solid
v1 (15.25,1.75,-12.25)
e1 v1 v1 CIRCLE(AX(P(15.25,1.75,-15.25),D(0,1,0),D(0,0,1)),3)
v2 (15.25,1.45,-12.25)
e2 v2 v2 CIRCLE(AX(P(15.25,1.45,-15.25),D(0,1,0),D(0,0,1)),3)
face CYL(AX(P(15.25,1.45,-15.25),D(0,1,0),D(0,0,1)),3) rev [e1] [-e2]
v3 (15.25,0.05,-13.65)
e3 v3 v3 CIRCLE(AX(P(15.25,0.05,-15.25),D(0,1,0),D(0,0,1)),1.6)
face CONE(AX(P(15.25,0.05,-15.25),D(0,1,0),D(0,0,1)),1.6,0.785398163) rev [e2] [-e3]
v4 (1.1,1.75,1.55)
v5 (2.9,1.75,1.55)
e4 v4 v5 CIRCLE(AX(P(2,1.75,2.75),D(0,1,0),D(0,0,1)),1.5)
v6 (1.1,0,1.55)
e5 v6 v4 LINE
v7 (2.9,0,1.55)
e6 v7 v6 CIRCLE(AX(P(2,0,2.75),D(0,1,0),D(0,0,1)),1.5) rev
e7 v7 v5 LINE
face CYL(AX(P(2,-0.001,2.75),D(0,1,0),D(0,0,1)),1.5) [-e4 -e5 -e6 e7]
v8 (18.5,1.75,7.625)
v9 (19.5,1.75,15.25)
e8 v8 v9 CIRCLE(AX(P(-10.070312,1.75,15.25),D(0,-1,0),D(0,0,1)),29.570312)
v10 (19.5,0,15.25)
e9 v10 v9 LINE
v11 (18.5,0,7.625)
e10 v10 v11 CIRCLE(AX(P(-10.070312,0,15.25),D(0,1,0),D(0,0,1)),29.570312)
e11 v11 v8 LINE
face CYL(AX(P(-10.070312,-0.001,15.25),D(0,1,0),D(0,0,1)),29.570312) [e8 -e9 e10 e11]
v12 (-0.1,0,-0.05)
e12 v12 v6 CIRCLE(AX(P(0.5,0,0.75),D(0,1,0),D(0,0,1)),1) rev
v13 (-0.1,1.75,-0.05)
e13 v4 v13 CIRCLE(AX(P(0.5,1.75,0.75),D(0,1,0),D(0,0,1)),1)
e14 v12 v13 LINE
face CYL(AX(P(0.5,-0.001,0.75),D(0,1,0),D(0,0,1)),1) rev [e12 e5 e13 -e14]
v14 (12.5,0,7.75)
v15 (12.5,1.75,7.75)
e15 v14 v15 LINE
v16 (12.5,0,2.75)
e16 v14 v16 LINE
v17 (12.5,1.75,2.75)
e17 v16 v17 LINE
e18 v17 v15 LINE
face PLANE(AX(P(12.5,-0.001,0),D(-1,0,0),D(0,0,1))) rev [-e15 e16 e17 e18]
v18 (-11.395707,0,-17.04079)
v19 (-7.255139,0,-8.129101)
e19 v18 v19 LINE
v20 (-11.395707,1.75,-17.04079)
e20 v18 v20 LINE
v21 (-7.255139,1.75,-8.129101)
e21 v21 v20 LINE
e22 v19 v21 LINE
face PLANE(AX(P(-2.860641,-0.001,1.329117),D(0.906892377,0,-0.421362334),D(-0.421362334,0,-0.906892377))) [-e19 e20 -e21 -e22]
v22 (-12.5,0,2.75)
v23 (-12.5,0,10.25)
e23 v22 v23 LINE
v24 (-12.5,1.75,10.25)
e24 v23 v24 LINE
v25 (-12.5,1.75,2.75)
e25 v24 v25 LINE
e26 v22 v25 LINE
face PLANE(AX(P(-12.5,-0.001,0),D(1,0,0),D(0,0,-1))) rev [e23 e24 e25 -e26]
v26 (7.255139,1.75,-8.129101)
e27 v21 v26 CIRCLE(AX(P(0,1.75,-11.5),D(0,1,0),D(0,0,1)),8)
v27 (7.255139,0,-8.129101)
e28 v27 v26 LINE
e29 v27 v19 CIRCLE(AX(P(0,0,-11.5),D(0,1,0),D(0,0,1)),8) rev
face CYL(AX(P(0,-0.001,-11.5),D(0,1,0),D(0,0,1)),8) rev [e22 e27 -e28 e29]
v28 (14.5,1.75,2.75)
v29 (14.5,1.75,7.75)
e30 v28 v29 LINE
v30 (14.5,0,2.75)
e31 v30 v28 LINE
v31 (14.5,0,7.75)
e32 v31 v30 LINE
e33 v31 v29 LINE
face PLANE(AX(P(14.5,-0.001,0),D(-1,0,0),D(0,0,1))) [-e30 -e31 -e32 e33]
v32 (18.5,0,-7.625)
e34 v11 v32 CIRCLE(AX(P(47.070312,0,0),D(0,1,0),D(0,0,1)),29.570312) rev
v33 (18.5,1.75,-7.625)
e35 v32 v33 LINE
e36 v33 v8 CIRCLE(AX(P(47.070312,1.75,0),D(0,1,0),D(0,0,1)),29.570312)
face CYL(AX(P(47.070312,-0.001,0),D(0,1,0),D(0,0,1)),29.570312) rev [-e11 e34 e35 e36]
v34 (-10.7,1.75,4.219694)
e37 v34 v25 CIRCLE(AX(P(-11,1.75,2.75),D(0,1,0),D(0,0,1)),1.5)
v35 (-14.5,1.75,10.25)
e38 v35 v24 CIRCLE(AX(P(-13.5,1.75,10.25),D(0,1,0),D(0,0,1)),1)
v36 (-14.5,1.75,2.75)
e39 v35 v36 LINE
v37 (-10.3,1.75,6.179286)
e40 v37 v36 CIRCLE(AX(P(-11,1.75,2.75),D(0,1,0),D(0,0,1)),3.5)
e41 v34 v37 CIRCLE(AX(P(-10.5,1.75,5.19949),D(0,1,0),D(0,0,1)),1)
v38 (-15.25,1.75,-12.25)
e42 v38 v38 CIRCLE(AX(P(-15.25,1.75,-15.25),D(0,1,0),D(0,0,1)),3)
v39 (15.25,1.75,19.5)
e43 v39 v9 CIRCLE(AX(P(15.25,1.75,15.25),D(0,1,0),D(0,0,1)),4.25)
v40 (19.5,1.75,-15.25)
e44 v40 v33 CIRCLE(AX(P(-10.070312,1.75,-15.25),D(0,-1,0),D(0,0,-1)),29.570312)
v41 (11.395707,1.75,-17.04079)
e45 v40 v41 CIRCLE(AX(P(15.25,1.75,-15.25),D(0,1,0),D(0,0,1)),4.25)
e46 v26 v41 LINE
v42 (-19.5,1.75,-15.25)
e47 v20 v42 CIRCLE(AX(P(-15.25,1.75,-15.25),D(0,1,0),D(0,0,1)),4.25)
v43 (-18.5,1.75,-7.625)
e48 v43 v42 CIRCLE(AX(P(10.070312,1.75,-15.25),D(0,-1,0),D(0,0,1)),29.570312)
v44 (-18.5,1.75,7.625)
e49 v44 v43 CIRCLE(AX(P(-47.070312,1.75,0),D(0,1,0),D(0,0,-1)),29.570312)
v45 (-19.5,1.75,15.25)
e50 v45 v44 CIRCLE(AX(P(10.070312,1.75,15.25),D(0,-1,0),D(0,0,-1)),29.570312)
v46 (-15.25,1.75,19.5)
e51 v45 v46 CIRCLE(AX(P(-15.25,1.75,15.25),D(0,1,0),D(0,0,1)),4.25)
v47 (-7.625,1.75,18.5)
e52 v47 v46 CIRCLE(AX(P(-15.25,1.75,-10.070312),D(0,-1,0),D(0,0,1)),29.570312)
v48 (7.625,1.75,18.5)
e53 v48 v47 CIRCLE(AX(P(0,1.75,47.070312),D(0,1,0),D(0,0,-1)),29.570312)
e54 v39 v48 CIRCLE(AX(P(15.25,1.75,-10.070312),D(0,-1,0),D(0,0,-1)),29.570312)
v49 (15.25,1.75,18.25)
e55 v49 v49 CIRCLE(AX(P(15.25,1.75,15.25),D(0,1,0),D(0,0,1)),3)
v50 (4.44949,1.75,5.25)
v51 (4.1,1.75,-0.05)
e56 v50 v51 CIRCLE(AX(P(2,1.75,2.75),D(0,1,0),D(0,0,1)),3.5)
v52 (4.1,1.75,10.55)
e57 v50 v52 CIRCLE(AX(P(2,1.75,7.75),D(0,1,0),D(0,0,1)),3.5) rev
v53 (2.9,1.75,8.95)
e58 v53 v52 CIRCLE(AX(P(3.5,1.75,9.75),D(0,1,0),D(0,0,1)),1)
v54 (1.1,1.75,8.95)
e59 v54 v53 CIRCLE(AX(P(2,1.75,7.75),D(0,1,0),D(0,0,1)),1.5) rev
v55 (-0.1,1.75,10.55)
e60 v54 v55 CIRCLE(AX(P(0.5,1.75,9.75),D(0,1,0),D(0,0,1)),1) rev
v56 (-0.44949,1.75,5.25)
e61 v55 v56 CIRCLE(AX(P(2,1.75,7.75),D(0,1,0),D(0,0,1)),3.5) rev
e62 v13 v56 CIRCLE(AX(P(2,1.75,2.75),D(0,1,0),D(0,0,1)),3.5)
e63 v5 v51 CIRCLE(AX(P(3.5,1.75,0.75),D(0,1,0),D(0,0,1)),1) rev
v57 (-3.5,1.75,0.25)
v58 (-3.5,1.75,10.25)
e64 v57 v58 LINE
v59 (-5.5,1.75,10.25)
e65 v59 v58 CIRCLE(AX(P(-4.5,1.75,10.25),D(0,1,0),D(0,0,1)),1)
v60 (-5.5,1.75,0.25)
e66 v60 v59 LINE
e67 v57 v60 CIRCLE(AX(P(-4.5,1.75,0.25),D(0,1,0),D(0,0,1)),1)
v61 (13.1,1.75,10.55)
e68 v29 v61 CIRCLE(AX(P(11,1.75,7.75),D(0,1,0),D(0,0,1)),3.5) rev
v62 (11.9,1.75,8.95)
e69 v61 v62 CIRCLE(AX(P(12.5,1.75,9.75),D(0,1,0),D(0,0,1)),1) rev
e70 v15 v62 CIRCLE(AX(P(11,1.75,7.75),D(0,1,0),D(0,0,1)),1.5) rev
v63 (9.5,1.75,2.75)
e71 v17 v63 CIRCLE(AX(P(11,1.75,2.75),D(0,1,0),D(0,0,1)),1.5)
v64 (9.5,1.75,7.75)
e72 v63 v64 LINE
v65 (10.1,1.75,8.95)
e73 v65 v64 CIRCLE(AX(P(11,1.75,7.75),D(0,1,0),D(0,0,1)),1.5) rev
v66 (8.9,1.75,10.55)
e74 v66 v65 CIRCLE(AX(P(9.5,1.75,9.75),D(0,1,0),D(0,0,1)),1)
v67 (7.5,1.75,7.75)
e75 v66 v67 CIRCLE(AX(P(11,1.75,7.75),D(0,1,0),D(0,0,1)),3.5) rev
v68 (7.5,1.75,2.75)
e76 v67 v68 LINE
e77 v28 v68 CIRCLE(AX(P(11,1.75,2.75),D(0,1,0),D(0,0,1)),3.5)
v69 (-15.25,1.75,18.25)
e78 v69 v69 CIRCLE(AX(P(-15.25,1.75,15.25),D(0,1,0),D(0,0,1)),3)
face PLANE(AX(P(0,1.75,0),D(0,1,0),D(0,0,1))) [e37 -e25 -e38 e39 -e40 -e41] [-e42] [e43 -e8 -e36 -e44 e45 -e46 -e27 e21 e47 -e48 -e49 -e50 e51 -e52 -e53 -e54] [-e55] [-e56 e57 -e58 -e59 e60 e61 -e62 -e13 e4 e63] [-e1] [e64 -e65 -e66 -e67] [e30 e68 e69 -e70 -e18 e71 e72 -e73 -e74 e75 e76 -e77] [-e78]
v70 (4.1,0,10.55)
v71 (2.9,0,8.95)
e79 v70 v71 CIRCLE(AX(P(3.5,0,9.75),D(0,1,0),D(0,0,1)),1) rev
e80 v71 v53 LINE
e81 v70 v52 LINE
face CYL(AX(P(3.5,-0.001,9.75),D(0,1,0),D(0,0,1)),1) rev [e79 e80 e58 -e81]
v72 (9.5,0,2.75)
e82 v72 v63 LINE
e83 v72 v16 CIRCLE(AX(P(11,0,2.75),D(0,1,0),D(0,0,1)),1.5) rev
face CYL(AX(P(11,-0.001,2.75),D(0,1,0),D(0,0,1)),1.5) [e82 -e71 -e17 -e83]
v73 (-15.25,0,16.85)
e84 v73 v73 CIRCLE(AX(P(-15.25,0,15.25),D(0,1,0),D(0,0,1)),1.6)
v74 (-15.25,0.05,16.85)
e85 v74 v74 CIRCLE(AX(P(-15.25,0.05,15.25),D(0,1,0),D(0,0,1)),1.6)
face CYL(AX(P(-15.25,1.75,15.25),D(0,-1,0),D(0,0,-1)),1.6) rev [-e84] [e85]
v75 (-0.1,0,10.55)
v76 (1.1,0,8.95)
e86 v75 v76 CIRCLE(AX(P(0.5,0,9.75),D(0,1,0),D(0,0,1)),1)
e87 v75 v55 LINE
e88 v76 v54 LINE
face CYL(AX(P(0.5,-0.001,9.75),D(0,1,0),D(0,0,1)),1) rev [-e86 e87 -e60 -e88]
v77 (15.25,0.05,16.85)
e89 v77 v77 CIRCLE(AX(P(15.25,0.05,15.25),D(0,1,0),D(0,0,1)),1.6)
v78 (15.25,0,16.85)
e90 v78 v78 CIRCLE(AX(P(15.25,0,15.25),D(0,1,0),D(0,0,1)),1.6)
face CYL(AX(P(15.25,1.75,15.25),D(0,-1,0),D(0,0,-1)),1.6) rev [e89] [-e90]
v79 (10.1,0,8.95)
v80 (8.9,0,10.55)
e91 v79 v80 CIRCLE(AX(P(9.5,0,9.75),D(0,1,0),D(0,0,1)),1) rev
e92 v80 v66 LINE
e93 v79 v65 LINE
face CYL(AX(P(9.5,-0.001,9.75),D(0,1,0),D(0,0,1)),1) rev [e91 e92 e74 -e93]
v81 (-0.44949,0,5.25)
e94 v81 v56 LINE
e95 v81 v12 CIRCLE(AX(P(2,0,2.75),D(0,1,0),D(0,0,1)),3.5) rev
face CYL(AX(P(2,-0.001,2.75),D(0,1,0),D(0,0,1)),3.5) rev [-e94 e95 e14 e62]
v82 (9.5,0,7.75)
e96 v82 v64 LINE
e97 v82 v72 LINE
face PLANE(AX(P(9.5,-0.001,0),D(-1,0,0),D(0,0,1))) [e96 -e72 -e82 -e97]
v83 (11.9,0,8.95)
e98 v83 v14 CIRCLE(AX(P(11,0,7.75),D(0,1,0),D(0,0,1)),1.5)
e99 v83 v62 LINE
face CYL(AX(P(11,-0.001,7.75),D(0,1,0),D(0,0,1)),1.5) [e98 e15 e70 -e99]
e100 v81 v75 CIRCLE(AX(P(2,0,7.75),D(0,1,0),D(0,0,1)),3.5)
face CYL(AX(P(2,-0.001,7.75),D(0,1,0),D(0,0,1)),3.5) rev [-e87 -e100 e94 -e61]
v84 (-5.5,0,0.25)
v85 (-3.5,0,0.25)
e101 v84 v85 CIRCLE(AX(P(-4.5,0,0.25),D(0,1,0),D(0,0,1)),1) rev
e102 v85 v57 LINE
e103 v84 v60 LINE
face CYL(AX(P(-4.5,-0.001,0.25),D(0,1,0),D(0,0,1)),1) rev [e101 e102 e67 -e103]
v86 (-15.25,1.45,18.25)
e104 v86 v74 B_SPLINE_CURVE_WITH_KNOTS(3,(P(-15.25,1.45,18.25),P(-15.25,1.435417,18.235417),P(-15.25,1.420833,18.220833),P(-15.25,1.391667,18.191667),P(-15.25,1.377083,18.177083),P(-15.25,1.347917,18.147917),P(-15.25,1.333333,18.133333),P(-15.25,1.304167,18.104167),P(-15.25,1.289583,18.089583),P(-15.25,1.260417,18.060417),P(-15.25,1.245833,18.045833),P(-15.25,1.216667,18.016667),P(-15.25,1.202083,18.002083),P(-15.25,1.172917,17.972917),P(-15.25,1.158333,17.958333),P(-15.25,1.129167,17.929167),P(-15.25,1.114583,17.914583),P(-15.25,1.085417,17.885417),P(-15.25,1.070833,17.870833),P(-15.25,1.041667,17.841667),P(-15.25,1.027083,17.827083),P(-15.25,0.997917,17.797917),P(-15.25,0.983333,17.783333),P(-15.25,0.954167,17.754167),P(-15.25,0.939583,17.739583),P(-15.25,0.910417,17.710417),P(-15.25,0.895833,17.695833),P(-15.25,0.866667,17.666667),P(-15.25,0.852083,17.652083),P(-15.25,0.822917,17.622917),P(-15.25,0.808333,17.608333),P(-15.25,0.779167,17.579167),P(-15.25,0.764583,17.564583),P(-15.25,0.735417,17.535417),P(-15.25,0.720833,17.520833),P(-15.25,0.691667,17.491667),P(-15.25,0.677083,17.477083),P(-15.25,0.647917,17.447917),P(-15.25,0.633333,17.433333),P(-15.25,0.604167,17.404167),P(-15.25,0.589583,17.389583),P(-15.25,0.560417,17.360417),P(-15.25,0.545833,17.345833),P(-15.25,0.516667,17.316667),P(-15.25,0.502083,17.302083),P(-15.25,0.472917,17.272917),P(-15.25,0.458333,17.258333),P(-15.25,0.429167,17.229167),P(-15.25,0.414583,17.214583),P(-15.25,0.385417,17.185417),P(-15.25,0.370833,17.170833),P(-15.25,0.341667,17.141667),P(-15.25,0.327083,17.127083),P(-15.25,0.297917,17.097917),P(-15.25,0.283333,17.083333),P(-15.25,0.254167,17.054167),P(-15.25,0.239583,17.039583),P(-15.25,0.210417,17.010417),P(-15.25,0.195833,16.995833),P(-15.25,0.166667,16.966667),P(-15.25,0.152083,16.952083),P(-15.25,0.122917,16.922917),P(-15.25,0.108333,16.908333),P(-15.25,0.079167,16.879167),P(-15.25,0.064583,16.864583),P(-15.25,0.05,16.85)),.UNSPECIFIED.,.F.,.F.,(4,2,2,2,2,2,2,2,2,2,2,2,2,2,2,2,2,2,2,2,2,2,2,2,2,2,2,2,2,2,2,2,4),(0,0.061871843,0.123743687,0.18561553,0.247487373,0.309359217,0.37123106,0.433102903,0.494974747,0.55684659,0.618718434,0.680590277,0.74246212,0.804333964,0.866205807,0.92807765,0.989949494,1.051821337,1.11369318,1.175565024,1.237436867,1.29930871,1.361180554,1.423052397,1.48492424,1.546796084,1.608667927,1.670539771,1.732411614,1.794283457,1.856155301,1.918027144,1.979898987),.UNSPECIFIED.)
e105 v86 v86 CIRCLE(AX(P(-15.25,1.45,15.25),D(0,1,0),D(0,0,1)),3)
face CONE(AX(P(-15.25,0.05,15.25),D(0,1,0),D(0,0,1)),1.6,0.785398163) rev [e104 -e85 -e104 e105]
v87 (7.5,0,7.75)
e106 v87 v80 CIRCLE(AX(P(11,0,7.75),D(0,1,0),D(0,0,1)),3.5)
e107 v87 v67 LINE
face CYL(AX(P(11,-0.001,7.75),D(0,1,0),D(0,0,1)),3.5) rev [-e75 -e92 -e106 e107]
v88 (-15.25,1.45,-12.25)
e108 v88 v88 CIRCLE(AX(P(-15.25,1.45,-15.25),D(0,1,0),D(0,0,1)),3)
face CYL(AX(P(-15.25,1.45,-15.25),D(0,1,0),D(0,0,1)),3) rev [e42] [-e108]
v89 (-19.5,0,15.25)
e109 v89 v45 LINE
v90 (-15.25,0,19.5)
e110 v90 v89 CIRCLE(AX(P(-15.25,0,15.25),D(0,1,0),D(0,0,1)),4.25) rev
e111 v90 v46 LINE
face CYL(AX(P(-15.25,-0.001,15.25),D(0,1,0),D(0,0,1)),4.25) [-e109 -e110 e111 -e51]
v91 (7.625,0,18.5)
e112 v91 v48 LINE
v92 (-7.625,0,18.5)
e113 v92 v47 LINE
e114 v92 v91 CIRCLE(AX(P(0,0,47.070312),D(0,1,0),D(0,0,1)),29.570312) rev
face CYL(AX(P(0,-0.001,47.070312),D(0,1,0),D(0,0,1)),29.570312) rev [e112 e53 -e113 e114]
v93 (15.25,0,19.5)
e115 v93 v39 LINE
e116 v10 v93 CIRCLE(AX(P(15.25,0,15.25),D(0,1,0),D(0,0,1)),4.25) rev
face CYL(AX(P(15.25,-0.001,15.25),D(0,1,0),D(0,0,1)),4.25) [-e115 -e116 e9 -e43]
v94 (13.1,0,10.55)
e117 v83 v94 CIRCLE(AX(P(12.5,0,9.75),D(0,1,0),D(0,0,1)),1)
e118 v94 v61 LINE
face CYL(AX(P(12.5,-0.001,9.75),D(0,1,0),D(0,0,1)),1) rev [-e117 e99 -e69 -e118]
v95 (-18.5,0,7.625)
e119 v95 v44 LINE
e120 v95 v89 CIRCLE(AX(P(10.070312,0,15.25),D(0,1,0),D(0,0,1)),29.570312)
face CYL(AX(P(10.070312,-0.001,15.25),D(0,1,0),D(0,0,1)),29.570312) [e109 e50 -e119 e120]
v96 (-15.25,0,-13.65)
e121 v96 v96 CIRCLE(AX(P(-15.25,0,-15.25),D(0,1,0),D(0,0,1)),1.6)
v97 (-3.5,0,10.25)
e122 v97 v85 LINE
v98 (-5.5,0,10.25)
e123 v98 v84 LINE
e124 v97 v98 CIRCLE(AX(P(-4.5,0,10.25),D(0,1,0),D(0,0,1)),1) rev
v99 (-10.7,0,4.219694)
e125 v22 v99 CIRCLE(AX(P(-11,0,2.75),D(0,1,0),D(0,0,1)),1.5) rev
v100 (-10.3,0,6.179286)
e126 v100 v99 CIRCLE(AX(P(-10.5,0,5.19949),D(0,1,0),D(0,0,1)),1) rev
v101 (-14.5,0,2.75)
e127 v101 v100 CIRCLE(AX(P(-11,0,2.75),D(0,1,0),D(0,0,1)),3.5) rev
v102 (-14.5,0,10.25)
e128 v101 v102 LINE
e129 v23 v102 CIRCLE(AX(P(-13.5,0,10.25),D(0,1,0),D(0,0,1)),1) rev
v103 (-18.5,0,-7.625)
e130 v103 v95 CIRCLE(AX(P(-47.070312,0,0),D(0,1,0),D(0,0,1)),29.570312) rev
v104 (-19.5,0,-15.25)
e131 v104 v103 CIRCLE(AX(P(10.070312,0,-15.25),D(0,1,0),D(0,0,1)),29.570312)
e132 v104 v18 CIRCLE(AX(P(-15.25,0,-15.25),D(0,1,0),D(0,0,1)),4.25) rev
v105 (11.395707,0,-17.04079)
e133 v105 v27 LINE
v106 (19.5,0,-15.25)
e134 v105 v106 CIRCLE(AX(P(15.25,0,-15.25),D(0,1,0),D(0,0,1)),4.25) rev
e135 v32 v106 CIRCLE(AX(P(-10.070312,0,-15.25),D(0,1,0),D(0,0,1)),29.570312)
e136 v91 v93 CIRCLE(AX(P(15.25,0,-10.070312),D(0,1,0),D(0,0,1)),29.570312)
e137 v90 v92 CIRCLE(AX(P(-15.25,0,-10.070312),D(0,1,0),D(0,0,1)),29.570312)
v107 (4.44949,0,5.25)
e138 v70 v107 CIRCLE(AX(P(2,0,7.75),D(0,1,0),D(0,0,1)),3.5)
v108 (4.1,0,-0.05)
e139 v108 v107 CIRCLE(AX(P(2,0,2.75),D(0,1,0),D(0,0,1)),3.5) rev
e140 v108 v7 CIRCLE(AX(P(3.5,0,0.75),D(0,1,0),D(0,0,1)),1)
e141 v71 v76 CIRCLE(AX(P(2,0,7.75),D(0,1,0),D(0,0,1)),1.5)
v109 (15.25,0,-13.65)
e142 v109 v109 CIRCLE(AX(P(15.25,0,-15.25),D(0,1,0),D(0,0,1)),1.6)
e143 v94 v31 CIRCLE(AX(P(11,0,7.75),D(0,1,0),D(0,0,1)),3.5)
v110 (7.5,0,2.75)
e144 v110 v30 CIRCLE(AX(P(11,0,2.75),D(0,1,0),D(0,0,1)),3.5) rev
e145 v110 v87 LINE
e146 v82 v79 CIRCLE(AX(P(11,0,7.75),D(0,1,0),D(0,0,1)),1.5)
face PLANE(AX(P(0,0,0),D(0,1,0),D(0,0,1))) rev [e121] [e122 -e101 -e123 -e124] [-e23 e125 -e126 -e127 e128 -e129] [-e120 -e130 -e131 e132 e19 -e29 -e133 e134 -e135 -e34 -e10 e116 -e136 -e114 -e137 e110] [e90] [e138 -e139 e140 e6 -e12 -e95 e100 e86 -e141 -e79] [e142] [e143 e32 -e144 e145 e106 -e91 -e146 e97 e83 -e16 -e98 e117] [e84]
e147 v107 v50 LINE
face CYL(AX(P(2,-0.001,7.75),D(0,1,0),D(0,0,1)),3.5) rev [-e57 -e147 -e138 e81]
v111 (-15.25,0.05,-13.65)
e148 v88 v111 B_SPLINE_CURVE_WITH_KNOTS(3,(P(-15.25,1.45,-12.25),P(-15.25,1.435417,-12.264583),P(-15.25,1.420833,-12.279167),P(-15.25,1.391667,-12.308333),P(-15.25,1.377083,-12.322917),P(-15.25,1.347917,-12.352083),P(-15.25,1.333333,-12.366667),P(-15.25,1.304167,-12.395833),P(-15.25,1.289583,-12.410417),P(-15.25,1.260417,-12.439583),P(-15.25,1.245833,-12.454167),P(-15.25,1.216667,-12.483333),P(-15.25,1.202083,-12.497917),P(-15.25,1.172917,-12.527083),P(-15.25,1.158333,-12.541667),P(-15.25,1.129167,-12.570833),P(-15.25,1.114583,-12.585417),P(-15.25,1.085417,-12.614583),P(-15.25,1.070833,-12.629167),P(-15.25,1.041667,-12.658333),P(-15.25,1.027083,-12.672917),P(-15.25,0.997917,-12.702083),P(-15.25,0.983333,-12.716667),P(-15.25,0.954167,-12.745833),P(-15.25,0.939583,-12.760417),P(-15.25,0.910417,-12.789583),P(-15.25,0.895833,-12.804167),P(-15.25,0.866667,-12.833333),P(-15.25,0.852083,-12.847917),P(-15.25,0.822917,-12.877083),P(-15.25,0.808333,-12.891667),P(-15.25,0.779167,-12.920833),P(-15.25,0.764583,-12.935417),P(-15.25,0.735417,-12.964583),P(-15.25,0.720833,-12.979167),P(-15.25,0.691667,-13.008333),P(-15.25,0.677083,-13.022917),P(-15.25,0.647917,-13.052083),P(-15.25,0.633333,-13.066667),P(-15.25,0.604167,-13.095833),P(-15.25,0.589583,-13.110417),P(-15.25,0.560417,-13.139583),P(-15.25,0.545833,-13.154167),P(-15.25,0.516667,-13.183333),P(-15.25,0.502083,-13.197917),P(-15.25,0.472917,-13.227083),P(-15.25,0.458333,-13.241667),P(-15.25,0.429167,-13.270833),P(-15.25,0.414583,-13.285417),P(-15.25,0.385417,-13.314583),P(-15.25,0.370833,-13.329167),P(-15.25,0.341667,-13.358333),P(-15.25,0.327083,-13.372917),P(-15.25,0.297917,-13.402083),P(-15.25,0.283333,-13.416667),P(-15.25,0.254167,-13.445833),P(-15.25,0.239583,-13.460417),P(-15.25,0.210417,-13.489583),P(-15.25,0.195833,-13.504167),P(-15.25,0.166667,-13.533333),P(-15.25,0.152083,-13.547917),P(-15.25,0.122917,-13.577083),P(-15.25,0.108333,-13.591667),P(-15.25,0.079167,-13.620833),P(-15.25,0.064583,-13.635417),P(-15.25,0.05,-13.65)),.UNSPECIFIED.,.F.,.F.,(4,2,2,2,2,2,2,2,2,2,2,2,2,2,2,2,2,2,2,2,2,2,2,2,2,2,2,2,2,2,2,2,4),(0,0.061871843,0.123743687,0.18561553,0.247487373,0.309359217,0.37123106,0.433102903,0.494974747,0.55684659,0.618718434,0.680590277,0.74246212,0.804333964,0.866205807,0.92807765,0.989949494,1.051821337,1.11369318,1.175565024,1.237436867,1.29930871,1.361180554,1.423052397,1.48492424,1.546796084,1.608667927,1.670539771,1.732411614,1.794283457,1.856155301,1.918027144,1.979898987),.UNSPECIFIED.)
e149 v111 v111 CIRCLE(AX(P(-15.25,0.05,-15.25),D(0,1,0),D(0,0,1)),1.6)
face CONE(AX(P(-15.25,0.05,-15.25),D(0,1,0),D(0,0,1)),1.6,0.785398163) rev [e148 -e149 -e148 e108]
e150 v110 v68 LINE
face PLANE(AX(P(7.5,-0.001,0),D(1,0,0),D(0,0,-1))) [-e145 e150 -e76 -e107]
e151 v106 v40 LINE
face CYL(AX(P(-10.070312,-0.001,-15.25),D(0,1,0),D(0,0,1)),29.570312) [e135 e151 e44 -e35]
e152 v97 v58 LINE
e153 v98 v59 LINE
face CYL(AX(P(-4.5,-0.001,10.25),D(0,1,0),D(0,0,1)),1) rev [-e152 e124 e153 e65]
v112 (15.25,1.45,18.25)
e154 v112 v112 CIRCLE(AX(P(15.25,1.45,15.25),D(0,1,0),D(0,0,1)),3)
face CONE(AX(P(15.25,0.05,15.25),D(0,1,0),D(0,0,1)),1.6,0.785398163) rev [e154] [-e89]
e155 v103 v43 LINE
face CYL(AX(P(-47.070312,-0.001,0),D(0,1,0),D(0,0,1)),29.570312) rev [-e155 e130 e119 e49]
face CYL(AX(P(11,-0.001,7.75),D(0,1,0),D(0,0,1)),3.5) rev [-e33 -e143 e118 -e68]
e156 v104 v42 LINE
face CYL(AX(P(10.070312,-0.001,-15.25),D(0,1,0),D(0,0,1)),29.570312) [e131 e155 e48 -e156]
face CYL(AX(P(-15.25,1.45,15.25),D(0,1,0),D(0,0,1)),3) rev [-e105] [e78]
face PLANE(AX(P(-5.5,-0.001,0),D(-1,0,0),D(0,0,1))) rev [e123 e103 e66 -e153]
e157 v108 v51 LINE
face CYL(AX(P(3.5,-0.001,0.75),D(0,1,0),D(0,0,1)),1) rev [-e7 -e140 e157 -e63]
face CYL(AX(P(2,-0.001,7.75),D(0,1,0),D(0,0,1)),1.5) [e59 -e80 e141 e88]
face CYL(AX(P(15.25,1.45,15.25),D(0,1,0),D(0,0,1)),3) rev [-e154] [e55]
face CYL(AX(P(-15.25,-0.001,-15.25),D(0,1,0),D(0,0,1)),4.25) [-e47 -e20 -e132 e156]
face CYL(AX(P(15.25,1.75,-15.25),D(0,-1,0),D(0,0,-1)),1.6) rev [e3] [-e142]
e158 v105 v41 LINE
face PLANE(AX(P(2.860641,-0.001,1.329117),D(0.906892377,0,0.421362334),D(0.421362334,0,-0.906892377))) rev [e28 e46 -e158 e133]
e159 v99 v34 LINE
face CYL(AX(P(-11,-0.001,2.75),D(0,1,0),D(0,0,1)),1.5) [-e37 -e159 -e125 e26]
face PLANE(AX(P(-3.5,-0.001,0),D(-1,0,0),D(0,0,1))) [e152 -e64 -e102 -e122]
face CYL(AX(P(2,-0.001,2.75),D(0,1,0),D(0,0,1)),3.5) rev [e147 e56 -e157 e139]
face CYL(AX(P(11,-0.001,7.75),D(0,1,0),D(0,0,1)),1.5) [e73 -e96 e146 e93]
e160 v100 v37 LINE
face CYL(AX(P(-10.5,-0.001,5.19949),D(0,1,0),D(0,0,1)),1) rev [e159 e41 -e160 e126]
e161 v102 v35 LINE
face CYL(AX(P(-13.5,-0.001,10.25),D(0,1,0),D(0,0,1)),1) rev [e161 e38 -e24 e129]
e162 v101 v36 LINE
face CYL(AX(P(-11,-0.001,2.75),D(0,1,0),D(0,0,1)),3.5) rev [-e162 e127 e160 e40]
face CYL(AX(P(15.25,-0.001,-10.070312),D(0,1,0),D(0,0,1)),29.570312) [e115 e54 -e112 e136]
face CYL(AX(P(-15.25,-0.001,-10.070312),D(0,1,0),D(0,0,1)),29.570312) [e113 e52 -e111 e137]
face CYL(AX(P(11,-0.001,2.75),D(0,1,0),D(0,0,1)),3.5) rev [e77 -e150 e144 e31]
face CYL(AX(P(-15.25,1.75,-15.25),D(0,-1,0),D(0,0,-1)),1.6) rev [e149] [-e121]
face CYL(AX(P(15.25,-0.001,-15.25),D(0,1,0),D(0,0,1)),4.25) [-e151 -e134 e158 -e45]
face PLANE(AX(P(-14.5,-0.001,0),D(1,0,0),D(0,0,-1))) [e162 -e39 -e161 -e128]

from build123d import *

# Parameters (mm, degrees)
SKETCH1_W                = 39
SKETCH1_H                = 39
SKETCH1_R                = 1.6
SHAPE_DEPTH              = 1.75
CAMERA_CUT_REACH         = 29.633
SKETCH2_R                = 8
SKETCH4_R                = 3
SCREW_HEAD_CUTS_DEPTH    = 0.3
SCREW_HEAD_CHAMFERS_SIZE = 1.4
BEAUTY_CUTS_REACH        = 29.633
NAME_REACH               = 29.633


with BuildPart() as part:
    # Sketch1 → Shape (new body)
    with BuildSketch(Plane(origin=(0, 0, 0), x_dir=(1, 0, 0), z_dir=(0, 1, 0))):
        Rectangle(SKETCH1_W, SKETCH1_H)
        with Locations(Location((-15.25, 15.25, 0), (0, 0, 270))):
            Circle(SKETCH1_R, mode=Mode.SUBTRACT)
        with Locations(Location((15.25, 15.25, 0), (0, 0, 270))):
            Circle(SKETCH1_R, mode=Mode.SUBTRACT)
        with Locations(Location((-15.25, -15.25, 0), (0, 0, 270))):
            Circle(SKETCH1_R, mode=Mode.SUBTRACT)
        with Locations(Location((15.25, -15.25, 0), (0, 0, 270))):
            Circle(SKETCH1_R, mode=Mode.SUBTRACT)
    extrude(amount=SHAPE_DEPTH)

    # Sketch2 → Camera cut (cut, up to next)
    with BuildSketch(Plane(origin=(0, 1.75, 0), x_dir=(1, 0, 0), z_dir=(0, 1, 0)), mode=Mode.PRIVATE) as camera_cut_sk1:
        with BuildLine():
            Line((-11.395707469, 17.040790074), (-7.255139017, 8.12910133))
            ThreePointArc((-7.255139017, 8.12910133), (-6.744152629, 15.803069291), (0, 19.5))
            Line((0, 19.5), (-12.538311002, 19.5))
            Line((-12.538311002, 19.5), (-11.395707469, 17.040790074))
        make_face()
    camera_cut_tool1 = extrude(camera_cut_sk1.sketch, amount=-CAMERA_CUT_REACH, mode=Mode.PRIVATE) & part.part
    # Sketch2 → Camera cut (cut, up to next)
    with BuildSketch(Plane(origin=(0, 1.75, 0), x_dir=(1, 0, 0), z_dir=(0, 1, 0)), mode=Mode.PRIVATE) as camera_cut_sk2:
        with Locations((0, 11.5)):
            Circle(SKETCH2_R)
    camera_cut_tool2 = extrude(camera_cut_sk2.sketch, amount=-CAMERA_CUT_REACH, mode=Mode.PRIVATE) & part.part
    # Sketch2 → Camera cut (cut, up to next)
    with BuildSketch(Plane(origin=(0, 1.75, 0), x_dir=(1, 0, 0), z_dir=(0, 1, 0)), mode=Mode.PRIVATE) as camera_cut_sk3:
        with BuildLine():
            ThreePointArc((8, 11.5), (7.811565533, 9.773893418), (7.255139017, 8.12910133))
            Line((7.255139017, 8.12910133), (11.395707531, 17.040790207))
            Line((11.395707531, 17.040790207), (12.538311002, 19.5))
            Line((12.538311002, 19.5), (0, 19.5))
            ThreePointArc((0, 19.5), (5.656854249, 17.156854249), (8, 11.5))
        make_face()
    camera_cut_tool3 = extrude(camera_cut_sk3.sketch, amount=-CAMERA_CUT_REACH, mode=Mode.PRIVATE) & part.part
    # Sketch2 → Camera cut (cut, up to next)
    with BuildSketch(Plane(origin=(0, 1.75, 0), x_dir=(1, 0, 0), z_dir=(0, 1, 0)), mode=Mode.PRIVATE) as camera_cut_sk4:
        with BuildLine():
            ThreePointArc((-15.249999971, 19.5), (-12.963994499, 18.832831122), (-11.395707469, 17.040790074))
            Line((-11.395707469, 17.040790074), (-12.538311002, 19.5))
            Line((-12.538311002, 19.5), (-15.249999971, 19.5))
        make_face()
    camera_cut_tool4 = extrude(camera_cut_sk4.sketch, amount=-CAMERA_CUT_REACH, mode=Mode.PRIVATE) & part.part
    # Sketch2 → Camera cut (cut, up to next)
    with BuildSketch(Plane(origin=(0, 1.75, 0), x_dir=(1, 0, 0), z_dir=(0, 1, 0)), mode=Mode.PRIVATE) as camera_cut_sk5:
        with BuildLine():
            Line((12.538311002, 19.5), (11.395707531, 17.040790207))
            ThreePointArc((11.395707531, 17.040790207), (12.963994574, 18.83283117), (15.25, 19.5))
            Line((15.25, 19.5), (12.538311002, 19.5))
        make_face()
    camera_cut_tool5 = extrude(camera_cut_sk5.sketch, amount=-CAMERA_CUT_REACH, mode=Mode.PRIVATE) & part.part
    # Sketch2 → Camera cut (cut, up to next)
    with BuildSketch(Plane(origin=(0, 1.75, 0), x_dir=(1, 0, 0), z_dir=(0, 1, 0)), mode=Mode.PRIVATE) as camera_cut_sk6:
        with BuildLine():
            ThreePointArc((-19.5, 15.25), (-18.25520381, 18.25520383), (-15.249999971, 19.5))
            Line((-15.249999971, 19.5), (-19.5, 19.5))
            Line((-19.5, 19.5), (-19.5, 15.25))
        make_face()
    camera_cut_tool6 = extrude(camera_cut_sk6.sketch, amount=-CAMERA_CUT_REACH, mode=Mode.PRIVATE) & part.part
    # Sketch2 → Camera cut (cut, up to next)
    with BuildSketch(Plane(origin=(0, 1.75, 0), x_dir=(1, 0, 0), z_dir=(0, 1, 0)), mode=Mode.PRIVATE) as camera_cut_sk7:
        with BuildLine():
            Line((19.5, 19.5), (15.25, 19.5))
            ThreePointArc((15.25, 19.5), (18.25520382, 18.25520382), (19.5, 15.25))
            Line((19.5, 15.25), (19.5, 19.5))
        make_face()
    camera_cut_tool7 = extrude(camera_cut_sk7.sketch, amount=-CAMERA_CUT_REACH, mode=Mode.PRIVATE) & part.part
    # Sketch2 → Camera cut (cut, up to next)
    with BuildSketch(Plane(origin=(0, 1.75, 0), x_dir=(1, 0, 0), z_dir=(0, 1, 0)), mode=Mode.PRIVATE) as camera_cut_sk8:
        with BuildLine():
            Line((19.5, -19.5), (19.5, -15.25))
            ThreePointArc((19.5, -15.25), (18.255203817, -18.255203823), (15.249999992, -19.5))
            Line((15.249999992, -19.5), (19.5, -19.5))
        make_face()
    camera_cut_tool8 = extrude(camera_cut_sk8.sketch, amount=-CAMERA_CUT_REACH, mode=Mode.PRIVATE) & part.part
    # Sketch2 → Camera cut (cut, up to next)
    with BuildSketch(Plane(origin=(0, 1.75, 0), x_dir=(1, 0, 0), z_dir=(0, 1, 0)), mode=Mode.PRIVATE) as camera_cut_sk9:
        with BuildLine():
            ThreePointArc((-15.25, -19.5), (-18.255203845, -18.255203795), (-19.5, -15.249999928))
            Line((-19.5, -15.249999928), (-19.5, -19.5))
            Line((-19.5, -19.5), (-15.25, -19.5))
        make_face()
    camera_cut_tool9 = extrude(camera_cut_sk9.sketch, amount=-CAMERA_CUT_REACH, mode=Mode.PRIVATE) & part.part
    add(camera_cut_tool1.solids().sort_by_distance((-8.247862, 1.75, -16.762503))[0], mode=Mode.SUBTRACT)
    add(camera_cut_tool2.solids().sort_by_distance((0, 1.75, -11.5))[0], mode=Mode.SUBTRACT)
    add(camera_cut_tool3.solids().sort_by_distance((8.247862, 1.75, -16.762503))[0], mode=Mode.SUBTRACT)
    add(camera_cut_tool4.solids().sort_by_distance((-12.870391, 1.75, -18.979534))[0], mode=Mode.SUBTRACT)
    add(camera_cut_tool5.solids().sort_by_distance((12.870391, 1.75, -18.979534))[0], mode=Mode.SUBTRACT)
    add(camera_cut_tool6.solids().sort_by_distance((-18.550686, 1.75, -18.550686))[0], mode=Mode.SUBTRACT)
    add(camera_cut_tool7.solids().sort_by_distance((18.550686, 1.75, -18.550686))[0], mode=Mode.SUBTRACT)
    add(camera_cut_tool8.solids().sort_by_distance((18.550686, 1.75, 18.550686))[0], mode=Mode.SUBTRACT)
    add(camera_cut_tool9.solids().sort_by_distance((-18.550686, 1.75, 18.550686))[0], mode=Mode.SUBTRACT)

    # Sketch4 → Screw head cuts (cut)
    with BuildSketch(Plane(origin=(0, 1.75, 0), x_dir=(1, 0, 0), z_dir=(0, 1, 0))):
        with Locations(Location((-15.25, 15.25, 0), (0, 0, 270))):
            Circle(SKETCH4_R)
        with Locations(Location((15.25, 15.25, 0), (0, 0, 270))):
            Circle(SKETCH4_R)
        with Locations(Location((15.25, -15.25, 0), (0, 0, 270))):
            Circle(SKETCH4_R)
        with Locations(Location((-15.25, -15.25, 0), (0, 0, 270))):
            Circle(SKETCH4_R)
    extrude(amount=-SCREW_HEAD_CUTS_DEPTH, mode=Mode.SUBTRACT)

    # Screw head chamfers
    screw_head_chamfers_edges = [part.edges().sort_by_distance(p)[0] for p in [
        (15.25, 1.45, 13.65),
        (-15.25, 1.45, 13.65),
        (-15.25, 1.45, -16.85),
        (15.25, 1.45, -16.85),
    ]]
    chamfer(screw_head_chamfers_edges, length=SCREW_HEAD_CHAMFERS_SIZE - 0.0001)  # a hair under: the kernel refuses the full size

    # Sketch5 → Beauty cuts (cut, up to next)
    with BuildSketch(Plane(origin=(0, 1.75, 0), x_dir=(1, 0, 0), z_dir=(0, 1, 0)), mode=Mode.PRIVATE) as beauty_cuts_sk1:
        with BuildLine():
            Line((-19.5, 15.25), (-19.5, -15.25))
            ThreePointArc((-19.5, -15.25), (-19.248934167, -11.404852896), (-18.5, -7.625))
            ThreePointArc((-18.5, -7.625), (-17.5, 0), (-18.5, 7.625))
            ThreePointArc((-18.5, 7.625), (-19.248934167, 11.404852896), (-19.5, 15.25))
        make_face()
    beauty_cuts_tool1 = extrude(beauty_cuts_sk1.sketch, amount=-BEAUTY_CUTS_REACH, mode=Mode.PRIVATE) & part.part
    # Sketch5 → Beauty cuts (cut, up to next)
    with BuildSketch(Plane(origin=(0, 1.75, 0), x_dir=(1, 0, 0), z_dir=(0, 1, 0)), mode=Mode.PRIVATE) as beauty_cuts_sk2:
        with BuildLine():
            Line((-15.25, -19.5), (15.25, -19.5))
            ThreePointArc((15.25, -19.5), (11.404852896, -19.248934167), (7.625, -18.5))
            ThreePointArc((7.625, -18.5), (0, -17.5), (-7.625, -18.5))
            ThreePointArc((-7.625, -18.5), (-11.404852896, -19.248934167), (-15.25, -19.5))
        make_face()
    beauty_cuts_tool2 = extrude(beauty_cuts_sk2.sketch, amount=-BEAUTY_CUTS_REACH, mode=Mode.PRIVATE) & part.part
    # Sketch5 → Beauty cuts (cut, up to next)
    with BuildSketch(Plane(origin=(0, 1.75, 0), x_dir=(1, 0, 0), z_dir=(0, 1, 0)), mode=Mode.PRIVATE) as beauty_cuts_sk3:
        with BuildLine():
            Line((19.5, -15.25), (19.5, 15.25))
            ThreePointArc((19.5, 15.25), (19.248934167, 11.404852896), (18.5, 7.625))
            ThreePointArc((18.5, 7.625), (17.5, 0), (18.5, -7.625))
            ThreePointArc((18.5, -7.625), (19.248934167, -11.404852896), (19.5, -15.25))
        make_face()
    beauty_cuts_tool3 = extrude(beauty_cuts_sk3.sketch, amount=-BEAUTY_CUTS_REACH, mode=Mode.PRIVATE) & part.part
    add(beauty_cuts_tool1.solids().sort_by_distance((-18.732027, 1.75, 0))[0], mode=Mode.SUBTRACT)
    add(beauty_cuts_tool2.solids().sort_by_distance((0, 1.75, 18.732027))[0], mode=Mode.SUBTRACT)
    add(beauty_cuts_tool3.solids().sort_by_distance((18.732027, 1.75, 0))[0], mode=Mode.SUBTRACT)

    # Sketch9 → Name (cut, up to next)
    with BuildSketch(Plane(origin=(0, 1.75, 0), x_dir=(1, 0, 0), z_dir=(0, 1, 0)), mode=Mode.PRIVATE) as name_sk1:
        with BuildLine():
            Line((-14.5, -2.75), (-14.5, -10.25))
            ThreePointArc((-14.5, -10.25), (-13.5, -11.25), (-12.5, -10.25))
            Line((-12.5, -10.25), (-12.5, -2.75))
            ThreePointArc((-12.5, -2.75), (-10.051316701, -1.588104997), (-10.700000002, -4.219693846))
            ThreePointArc((-10.700000002, -4.219693846), (-11.479795894, -5.399489759), (-10.299999969, -6.179285634))
            ThreePointArc((-10.299999969, -6.179285634), (-8.78640565, -0.038911648), (-14.5, -2.75))
        make_face()
    name_tool1 = extrude(name_sk1.sketch, amount=-NAME_REACH, mode=Mode.PRIVATE) & part.part
    # Sketch9 → Name (cut, up to next)
    with BuildSketch(Plane(origin=(0, 1.75, 0), x_dir=(1, 0, 0), z_dir=(0, 1, 0)), mode=Mode.PRIVATE) as name_sk2:
        with BuildLine():
            Line((-3.5, -10.25), (-3.5, -0.25))
            ThreePointArc((-3.5, -0.25), (-4.5, 0.75), (-5.5, -0.25))
            Line((-5.5, -0.25), (-5.5, -10.25))
            ThreePointArc((-5.5, -10.25), (-4.5, -11.25), (-3.5, -10.25))
        make_face()
    name_tool2 = extrude(name_sk2.sketch, amount=-NAME_REACH, mode=Mode.PRIVATE) & part.part
    # Sketch9 → Name (cut, up to next)
    with BuildSketch(Plane(origin=(0, 1.75, 0), x_dir=(1, 0, 0), z_dir=(0, 1, 0)), mode=Mode.PRIVATE) as name_sk3:
        with BuildLine():
            Line((7.5, -2.75), (7.5, -7.75))
            ThreePointArc((7.5, -7.75), (7.869504796, -9.315247513), (8.899999873, -10.549999905))
            ThreePointArc((8.899999873, -10.549999905), (10.299999948, -10.35000007), (10.100000013, -8.950000009))
            ThreePointArc((10.100000013, -8.950000009), (9.658359217, -8.4208204), (9.5, -7.75))
            Line((9.5, -7.75), (9.5, -2.75))
            ThreePointArc((9.5, -2.75), (11, -1.25), (12.5, -2.75))
            Line((12.5, -2.75), (12.5, -7.75))
            ThreePointArc((12.5, -7.75), (12.341640763, -8.420820441), (11.899999915, -8.950000063))
            ThreePointArc((11.899999915, -8.950000063), (11.700000022, -10.350000029), (13.099999973, -10.55000002))
            ThreePointArc((13.099999973, -10.55000002), (14.130495161, -9.315247599), (14.5, -7.75))
            Line((14.5, -7.75), (14.5, -2.75))
            ThreePointArc((14.5, -2.75), (11, 0.75), (7.5, -2.75))
        make_face()
    name_tool3 = extrude(name_sk3.sketch, amount=-NAME_REACH, mode=Mode.PRIVATE) & part.part
    # Sketch9 → Name (cut, up to next)
    with BuildSketch(Plane(origin=(0, 1.75, 0), x_dir=(1, 0, 0), z_dir=(0, 1, 0)), mode=Mode.PRIVATE) as name_sk4:
        with BuildLine():
            ThreePointArc((4.449489743, -5.25), (5.492415246, -2.519705084), (4.100000076, 0.049999943))
            ThreePointArc((4.100000076, 0.049999943), (2.700000014, -0.149999982), (2.90000004, -1.55000003))
            ThreePointArc((2.90000004, -1.55000003), (2.000000004, -4.25), (1.099999954, -1.550000035))
            ThreePointArc((1.099999954, -1.550000035), (1.29999999, -0.149999987), (-0.100000073, 0.049999945))
            ThreePointArc((-0.100000073, 0.049999945), (-1.492415246, -2.519705082), (-0.449489743, -5.25))
            ThreePointArc((-0.449489743, -5.25), (-1.492415245, -7.980294938), (-0.100000041, -10.54999997))
            ThreePointArc((-0.100000041, -10.54999997), (1.300000023, -10.34999997), (1.099999899, -8.949999924))
            ThreePointArc((1.099999899, -8.949999924), (1.999999996, -6.25), (2.900000108, -8.949999919))
            ThreePointArc((2.900000108, -8.949999919), (2.699999963, -10.34999995), (4.100000008, -10.549999994))
            ThreePointArc((4.100000008, -10.549999994), (5.492415243, -7.980294958), (4.449489743, -5.25))
        make_face()
    name_tool4 = extrude(name_sk4.sketch, amount=-NAME_REACH, mode=Mode.PRIVATE) & part.part
    add(name_tool1.solids().sort_by_distance((-8.874269, 1.75, 0.146522))[0], mode=Mode.SUBTRACT)
    add(name_tool2.solids().sort_by_distance((-4.5, 1.75, 5.25))[0], mode=Mode.SUBTRACT)
    add(name_tool3.solids().sort_by_distance((14.365371, 1.75, 5.25))[0], mode=Mode.SUBTRACT)
    add(name_tool4.solids().sort_by_distance((2, 1.75, 5.25))[0], mode=Mode.SUBTRACT)


solid = part.part
